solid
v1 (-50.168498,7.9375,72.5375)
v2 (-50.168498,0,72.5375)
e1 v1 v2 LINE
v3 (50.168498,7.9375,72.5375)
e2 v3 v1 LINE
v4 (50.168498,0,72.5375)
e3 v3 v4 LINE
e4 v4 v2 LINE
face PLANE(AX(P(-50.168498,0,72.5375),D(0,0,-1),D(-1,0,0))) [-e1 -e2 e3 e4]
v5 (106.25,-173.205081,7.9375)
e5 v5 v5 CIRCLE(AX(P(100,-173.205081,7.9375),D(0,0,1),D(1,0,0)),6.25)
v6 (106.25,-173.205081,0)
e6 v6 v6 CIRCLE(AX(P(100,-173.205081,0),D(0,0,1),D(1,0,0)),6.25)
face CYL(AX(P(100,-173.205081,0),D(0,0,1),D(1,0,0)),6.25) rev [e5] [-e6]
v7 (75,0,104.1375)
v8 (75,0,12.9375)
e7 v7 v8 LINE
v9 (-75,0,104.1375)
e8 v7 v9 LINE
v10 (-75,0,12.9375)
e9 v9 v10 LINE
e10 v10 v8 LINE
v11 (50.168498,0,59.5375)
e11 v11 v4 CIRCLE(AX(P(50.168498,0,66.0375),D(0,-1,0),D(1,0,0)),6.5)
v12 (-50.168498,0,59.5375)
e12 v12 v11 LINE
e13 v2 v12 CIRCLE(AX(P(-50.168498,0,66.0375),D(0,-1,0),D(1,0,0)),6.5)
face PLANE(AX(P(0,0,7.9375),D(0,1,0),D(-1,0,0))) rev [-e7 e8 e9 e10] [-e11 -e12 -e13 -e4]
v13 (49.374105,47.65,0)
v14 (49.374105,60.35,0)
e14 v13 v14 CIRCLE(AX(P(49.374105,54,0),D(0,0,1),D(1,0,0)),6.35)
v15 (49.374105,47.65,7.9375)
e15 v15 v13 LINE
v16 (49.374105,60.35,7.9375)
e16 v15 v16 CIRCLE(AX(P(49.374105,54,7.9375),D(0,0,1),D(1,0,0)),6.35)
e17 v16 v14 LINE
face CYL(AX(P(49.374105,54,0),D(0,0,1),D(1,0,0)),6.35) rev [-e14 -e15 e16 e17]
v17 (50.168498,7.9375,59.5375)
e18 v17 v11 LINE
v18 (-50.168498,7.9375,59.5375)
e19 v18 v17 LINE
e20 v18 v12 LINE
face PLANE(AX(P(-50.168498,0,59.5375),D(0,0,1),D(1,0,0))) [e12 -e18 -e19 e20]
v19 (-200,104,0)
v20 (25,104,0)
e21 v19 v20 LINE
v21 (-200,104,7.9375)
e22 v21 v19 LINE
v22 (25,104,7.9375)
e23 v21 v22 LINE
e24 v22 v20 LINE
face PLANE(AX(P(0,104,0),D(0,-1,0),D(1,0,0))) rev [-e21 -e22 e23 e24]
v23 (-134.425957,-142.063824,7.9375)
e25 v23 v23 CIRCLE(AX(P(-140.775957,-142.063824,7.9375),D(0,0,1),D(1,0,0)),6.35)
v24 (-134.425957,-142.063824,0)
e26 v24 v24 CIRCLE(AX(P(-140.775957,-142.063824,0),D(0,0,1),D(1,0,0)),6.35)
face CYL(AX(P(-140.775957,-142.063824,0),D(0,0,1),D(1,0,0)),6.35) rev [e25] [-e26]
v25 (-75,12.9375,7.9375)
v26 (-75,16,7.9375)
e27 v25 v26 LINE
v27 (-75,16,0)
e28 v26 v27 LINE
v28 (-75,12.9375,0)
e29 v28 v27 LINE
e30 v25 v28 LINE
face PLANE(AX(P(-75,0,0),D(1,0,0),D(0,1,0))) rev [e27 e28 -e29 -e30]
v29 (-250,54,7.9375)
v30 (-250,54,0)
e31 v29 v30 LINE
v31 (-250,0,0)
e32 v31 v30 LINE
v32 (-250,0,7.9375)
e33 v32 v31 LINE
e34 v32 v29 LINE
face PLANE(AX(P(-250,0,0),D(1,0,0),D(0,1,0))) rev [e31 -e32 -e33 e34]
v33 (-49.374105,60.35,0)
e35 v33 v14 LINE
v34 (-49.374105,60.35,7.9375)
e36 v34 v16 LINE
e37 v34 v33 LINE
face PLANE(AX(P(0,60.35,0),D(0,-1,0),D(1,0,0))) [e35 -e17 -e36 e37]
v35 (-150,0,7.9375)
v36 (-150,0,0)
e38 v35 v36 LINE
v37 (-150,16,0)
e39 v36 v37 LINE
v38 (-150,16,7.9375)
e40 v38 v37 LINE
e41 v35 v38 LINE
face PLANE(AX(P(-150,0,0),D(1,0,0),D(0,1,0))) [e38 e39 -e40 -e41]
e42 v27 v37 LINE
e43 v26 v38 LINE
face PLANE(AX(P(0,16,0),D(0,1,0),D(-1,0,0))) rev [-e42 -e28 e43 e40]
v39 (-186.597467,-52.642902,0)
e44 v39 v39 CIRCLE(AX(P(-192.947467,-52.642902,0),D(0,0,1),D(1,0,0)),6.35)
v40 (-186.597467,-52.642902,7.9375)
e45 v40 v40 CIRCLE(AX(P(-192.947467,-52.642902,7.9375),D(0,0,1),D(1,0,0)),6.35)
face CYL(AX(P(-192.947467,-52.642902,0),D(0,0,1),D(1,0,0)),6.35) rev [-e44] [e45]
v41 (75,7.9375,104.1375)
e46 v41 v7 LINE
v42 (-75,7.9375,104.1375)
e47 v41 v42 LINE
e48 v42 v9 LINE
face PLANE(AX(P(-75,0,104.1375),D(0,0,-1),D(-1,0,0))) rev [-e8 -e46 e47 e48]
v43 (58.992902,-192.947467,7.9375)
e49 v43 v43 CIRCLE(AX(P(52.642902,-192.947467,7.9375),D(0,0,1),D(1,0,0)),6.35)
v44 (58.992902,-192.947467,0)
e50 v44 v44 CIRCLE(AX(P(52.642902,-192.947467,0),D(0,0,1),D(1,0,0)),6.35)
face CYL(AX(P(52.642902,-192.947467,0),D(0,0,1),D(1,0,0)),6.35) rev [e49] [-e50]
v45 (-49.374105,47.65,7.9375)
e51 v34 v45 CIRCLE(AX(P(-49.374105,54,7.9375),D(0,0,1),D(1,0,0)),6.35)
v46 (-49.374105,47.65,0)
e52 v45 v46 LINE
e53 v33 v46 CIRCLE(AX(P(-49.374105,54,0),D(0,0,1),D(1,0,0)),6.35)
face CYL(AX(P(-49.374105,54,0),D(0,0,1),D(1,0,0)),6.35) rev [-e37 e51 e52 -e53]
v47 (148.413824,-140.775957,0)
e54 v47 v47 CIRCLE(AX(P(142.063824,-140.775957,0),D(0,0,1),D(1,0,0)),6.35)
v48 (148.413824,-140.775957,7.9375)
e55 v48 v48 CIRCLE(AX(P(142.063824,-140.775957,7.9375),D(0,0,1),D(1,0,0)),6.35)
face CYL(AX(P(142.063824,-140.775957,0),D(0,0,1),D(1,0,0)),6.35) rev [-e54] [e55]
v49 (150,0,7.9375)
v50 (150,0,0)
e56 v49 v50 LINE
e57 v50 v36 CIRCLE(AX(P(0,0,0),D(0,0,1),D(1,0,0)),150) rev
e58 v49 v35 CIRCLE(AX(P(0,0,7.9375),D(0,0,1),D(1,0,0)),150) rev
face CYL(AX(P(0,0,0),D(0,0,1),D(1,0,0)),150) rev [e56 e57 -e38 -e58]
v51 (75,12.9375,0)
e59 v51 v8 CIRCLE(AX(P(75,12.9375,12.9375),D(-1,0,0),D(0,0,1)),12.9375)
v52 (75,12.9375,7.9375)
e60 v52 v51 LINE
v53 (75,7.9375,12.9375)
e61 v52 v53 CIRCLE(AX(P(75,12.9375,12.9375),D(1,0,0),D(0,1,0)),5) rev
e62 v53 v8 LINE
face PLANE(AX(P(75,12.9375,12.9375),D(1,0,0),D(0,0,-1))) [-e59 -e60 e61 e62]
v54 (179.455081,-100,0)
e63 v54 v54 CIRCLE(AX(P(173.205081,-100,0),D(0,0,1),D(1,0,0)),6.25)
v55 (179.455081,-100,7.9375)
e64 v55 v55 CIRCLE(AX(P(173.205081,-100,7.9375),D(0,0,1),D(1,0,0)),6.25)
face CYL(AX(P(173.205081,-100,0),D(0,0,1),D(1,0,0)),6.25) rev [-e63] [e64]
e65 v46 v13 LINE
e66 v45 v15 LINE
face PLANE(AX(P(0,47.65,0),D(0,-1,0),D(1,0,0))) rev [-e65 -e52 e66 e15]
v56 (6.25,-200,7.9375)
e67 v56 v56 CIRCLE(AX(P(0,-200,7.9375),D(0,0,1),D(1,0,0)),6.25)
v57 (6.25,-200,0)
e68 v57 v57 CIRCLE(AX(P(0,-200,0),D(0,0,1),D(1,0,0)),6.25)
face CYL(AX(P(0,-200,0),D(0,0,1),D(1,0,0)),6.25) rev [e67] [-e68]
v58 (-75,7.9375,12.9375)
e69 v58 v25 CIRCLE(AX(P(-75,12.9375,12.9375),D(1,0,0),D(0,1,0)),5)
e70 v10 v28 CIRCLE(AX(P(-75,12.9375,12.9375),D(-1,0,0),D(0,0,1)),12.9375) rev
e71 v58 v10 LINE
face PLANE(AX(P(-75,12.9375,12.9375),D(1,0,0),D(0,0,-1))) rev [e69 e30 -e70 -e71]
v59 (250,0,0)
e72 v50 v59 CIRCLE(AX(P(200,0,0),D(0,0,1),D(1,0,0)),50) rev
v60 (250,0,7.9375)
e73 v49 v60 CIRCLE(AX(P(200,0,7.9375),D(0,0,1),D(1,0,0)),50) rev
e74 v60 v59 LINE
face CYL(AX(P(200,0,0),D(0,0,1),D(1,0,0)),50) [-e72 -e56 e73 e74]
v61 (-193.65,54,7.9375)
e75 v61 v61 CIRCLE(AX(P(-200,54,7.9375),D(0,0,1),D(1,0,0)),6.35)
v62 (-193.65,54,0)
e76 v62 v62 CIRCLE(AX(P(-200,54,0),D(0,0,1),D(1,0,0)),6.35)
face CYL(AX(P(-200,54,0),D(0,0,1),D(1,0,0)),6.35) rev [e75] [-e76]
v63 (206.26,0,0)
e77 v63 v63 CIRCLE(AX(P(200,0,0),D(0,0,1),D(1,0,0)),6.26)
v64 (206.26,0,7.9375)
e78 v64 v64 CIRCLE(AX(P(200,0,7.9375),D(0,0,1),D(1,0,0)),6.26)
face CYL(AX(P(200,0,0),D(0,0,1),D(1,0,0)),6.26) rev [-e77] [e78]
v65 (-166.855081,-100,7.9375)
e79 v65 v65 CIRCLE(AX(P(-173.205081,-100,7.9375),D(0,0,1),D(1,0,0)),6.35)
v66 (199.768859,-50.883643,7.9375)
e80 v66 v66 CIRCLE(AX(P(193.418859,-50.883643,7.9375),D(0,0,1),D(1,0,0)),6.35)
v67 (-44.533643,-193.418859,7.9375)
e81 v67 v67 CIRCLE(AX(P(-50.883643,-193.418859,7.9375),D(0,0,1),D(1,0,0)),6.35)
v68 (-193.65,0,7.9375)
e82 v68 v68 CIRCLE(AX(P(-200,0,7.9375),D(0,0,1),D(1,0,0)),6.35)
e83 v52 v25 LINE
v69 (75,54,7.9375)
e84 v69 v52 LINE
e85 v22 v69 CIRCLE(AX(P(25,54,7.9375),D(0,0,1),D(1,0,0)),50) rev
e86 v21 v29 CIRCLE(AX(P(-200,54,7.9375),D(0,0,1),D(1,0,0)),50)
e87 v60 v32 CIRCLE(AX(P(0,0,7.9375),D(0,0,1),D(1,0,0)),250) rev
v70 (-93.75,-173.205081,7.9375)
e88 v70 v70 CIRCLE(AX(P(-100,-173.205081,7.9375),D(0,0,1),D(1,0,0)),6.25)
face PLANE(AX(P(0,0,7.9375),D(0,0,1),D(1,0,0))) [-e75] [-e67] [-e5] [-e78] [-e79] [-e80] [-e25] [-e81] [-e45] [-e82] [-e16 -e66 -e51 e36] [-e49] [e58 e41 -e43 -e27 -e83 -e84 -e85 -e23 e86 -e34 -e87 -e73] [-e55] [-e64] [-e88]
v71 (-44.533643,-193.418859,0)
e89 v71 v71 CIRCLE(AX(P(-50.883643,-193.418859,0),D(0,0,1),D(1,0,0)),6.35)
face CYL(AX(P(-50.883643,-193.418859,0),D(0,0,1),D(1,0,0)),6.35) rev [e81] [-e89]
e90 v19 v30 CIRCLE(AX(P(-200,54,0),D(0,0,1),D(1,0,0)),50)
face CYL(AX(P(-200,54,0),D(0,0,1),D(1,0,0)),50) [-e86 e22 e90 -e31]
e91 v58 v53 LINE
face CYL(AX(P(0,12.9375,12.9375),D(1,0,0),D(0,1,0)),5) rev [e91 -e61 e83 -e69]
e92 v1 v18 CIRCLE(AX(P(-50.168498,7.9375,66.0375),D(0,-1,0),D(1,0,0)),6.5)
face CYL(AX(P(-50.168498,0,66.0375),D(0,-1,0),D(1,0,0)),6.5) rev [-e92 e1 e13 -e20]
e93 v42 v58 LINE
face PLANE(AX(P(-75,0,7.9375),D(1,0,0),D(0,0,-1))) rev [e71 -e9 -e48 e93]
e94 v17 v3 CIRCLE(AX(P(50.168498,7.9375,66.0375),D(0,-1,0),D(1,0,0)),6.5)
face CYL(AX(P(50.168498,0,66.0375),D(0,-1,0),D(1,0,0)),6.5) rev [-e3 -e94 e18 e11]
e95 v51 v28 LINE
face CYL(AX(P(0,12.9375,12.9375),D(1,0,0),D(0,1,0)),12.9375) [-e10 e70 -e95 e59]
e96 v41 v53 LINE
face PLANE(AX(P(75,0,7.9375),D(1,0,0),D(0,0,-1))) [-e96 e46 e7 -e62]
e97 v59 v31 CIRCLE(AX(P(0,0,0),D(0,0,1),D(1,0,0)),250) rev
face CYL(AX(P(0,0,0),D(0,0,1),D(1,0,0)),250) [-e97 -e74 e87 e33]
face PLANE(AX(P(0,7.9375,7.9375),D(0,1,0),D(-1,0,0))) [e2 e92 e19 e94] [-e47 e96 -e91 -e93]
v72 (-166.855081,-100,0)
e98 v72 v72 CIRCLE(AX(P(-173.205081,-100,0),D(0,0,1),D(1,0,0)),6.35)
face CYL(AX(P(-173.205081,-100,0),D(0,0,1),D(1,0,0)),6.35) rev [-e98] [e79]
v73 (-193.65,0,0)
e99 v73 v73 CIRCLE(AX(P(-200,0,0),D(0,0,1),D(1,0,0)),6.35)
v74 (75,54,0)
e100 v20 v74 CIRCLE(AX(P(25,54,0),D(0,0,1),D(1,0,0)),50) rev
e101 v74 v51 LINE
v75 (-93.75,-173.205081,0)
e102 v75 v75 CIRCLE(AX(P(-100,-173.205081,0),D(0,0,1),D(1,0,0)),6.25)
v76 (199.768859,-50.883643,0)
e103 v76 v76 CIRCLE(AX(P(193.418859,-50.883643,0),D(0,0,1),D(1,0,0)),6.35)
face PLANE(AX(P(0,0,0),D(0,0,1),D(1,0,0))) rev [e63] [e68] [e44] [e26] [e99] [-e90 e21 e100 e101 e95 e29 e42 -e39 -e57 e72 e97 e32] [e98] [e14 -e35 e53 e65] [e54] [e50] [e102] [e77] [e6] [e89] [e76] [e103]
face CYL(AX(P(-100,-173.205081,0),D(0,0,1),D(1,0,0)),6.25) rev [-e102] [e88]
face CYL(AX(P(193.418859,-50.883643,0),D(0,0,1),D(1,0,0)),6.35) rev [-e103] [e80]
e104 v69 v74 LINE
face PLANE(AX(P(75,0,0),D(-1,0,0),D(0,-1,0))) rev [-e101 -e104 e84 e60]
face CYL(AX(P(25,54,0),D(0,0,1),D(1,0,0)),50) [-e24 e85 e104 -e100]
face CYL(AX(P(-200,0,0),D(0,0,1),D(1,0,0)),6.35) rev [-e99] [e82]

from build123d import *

# Parameters (mm, degrees)
CROQUIS1_R                = 6.35
CROQUIS1_R_2              = 6.26
CROQUIS1_R_3              = 6.25
SALIENTE_EXTRUIR1_DEPTH   = 7.9375
CROQUIS2_W                = 150
CROQUIS2_H                = 104.1375
SALIENTE_EXTRUIR2_DEPTH   = 7.9375
CONVERTIR_S_LIDO4_START   = -75
CONVERTIR_S_LIDO4_DEPTH   = 150
CONVERTIR_S_LIDO4_2_DEPTH = 150


# Read off the part's stored shape, not the designer's step: Convertir-Sólido4
with BuildPart() as part:
    # Croquis1 → Saliente-Extruir1 (new body)
    with BuildSketch(Plane.XY):
        with BuildLine():
            Line((-75, 16), (-75, 0))
            Line((-75, 0), (75, 0))
            Line((75, 0), (75, 54))
            ThreePointArc((75, 54), (60.355339059, 89.355339059), (25, 104))
            Line((25, 104), (-200, 104))
            ThreePointArc((-200, 104), (-235.355339059, 89.355339059), (-250, 54))
            Line((-250, 54), (-250, 0))
            ThreePointArc((-250, 0), (0, -250), (250, 0))
            ThreePointArc((250, 0), (200, 50), (150, 0))
            ThreePointArc((150, 0), (0, -150), (-150, 0))
            Line((-150, 0), (-150, 16))
            Line((-150, 16), (-75, 16))
        make_face()
        with BuildLine():
            ThreePointArc((-49.374105038, 47.65), (-55.724105038, 54), (-49.374105038, 60.35))
            Line((-49.374105038, 60.35), (49.374105038, 60.35))
            ThreePointArc((49.374105038, 60.35), (55.724105038, 54), (49.374105038, 47.65))
            Line((49.374105038, 47.65), (-49.374105038, 47.65))
        make_face(mode=Mode.SUBTRACT)
        with Locations((193.418858597, -50.883643138)):
            Circle(CROQUIS1_R, mode=Mode.SUBTRACT)
        with Locations((200, 0)):
            Circle(CROQUIS1_R_2, mode=Mode.SUBTRACT)
        with Locations((-100, -173.205080757)):
            Circle(CROQUIS1_R_3, mode=Mode.SUBTRACT)
        with Locations((-50.883643138, -193.418858597)):
            Circle(CROQUIS1_R, mode=Mode.SUBTRACT)
        with Locations((-140.775956893, -142.063823547)):
            Circle(CROQUIS1_R, mode=Mode.SUBTRACT)
        with Locations((-173.205080757, -100)):
            Circle(CROQUIS1_R, mode=Mode.SUBTRACT)
        with Locations((0, -200)):
            Circle(CROQUIS1_R_3, mode=Mode.SUBTRACT)
        with Locations((52.642901704, -192.947466685)):
            Circle(CROQUIS1_R, mode=Mode.SUBTRACT)
        with Locations((100, -173.205080757)):
            Circle(CROQUIS1_R_3, mode=Mode.SUBTRACT)
        with Locations((142.063823547, -140.775956893)):
            Circle(CROQUIS1_R, mode=Mode.SUBTRACT)
        with Locations((173.205080757, -100)):
            Circle(CROQUIS1_R_3, mode=Mode.SUBTRACT)
        with Locations((-192.947466685, -52.642901704)):
            Circle(CROQUIS1_R, mode=Mode.SUBTRACT)
        with Locations((-200, 0)):
            Circle(CROQUIS1_R, mode=Mode.SUBTRACT)
        with Locations((-200, 54)):
            Circle(CROQUIS1_R, mode=Mode.SUBTRACT)
    extrude(amount=SALIENTE_EXTRUIR1_DEPTH)

    # Croquis2 → Saliente-Extruir2 (add)
    with BuildSketch(Plane.XZ):
        with Locations((0, 52.06875)):
            Rectangle(CROQUIS2_W, CROQUIS2_H)
        with BuildLine():
            Line((-50.16849794, 72.5375), (50.16849794, 72.5375))
            ThreePointArc((50.16849794, 72.5375), (56.66849794, 66.0375), (50.16849794, 59.5375))
            Line((50.16849794, 59.5375), (-50.16849794, 59.5375))
            ThreePointArc((-50.16849794, 59.5375), (-56.66849794, 66.0375), (-50.16849794, 72.5375))
        make_face(mode=Mode.SUBTRACT)
    extrude(amount=-SALIENTE_EXTRUIR2_DEPTH)

    # Convertir-Sólido4 outline → Convertir-Sólido4 (cut)
    with BuildSketch(Plane.YZ.offset(CONVERTIR_S_LIDO4_START)):
        with BuildLine():
            Line((0, 12.9375), (0, 0))
            Line((0, 0), (12.9375, 0))
            ThreePointArc((12.9375, 0), (3.789306018, 3.789306018), (0, 12.9375))
        make_face()
    extrude(amount=CONVERTIR_S_LIDO4_DEPTH, mode=Mode.SUBTRACT)

    # Convertir-S_lido4 2 outline → Convertir-S_lido4 2 (add)
    with BuildSketch(Plane.YZ.offset(CONVERTIR_S_LIDO4_START)):
        with BuildLine():
            Line((7.9375, 12.9375), (7.9375, 7.9375))
            Line((7.9375, 7.9375), (12.9375, 7.9375))
            ThreePointArc((12.9375, 7.9375), (9.401966094, 9.401966094), (7.9375, 12.9375))
        make_face()
    extrude(amount=CONVERTIR_S_LIDO4_2_DEPTH)


solid = part.part
